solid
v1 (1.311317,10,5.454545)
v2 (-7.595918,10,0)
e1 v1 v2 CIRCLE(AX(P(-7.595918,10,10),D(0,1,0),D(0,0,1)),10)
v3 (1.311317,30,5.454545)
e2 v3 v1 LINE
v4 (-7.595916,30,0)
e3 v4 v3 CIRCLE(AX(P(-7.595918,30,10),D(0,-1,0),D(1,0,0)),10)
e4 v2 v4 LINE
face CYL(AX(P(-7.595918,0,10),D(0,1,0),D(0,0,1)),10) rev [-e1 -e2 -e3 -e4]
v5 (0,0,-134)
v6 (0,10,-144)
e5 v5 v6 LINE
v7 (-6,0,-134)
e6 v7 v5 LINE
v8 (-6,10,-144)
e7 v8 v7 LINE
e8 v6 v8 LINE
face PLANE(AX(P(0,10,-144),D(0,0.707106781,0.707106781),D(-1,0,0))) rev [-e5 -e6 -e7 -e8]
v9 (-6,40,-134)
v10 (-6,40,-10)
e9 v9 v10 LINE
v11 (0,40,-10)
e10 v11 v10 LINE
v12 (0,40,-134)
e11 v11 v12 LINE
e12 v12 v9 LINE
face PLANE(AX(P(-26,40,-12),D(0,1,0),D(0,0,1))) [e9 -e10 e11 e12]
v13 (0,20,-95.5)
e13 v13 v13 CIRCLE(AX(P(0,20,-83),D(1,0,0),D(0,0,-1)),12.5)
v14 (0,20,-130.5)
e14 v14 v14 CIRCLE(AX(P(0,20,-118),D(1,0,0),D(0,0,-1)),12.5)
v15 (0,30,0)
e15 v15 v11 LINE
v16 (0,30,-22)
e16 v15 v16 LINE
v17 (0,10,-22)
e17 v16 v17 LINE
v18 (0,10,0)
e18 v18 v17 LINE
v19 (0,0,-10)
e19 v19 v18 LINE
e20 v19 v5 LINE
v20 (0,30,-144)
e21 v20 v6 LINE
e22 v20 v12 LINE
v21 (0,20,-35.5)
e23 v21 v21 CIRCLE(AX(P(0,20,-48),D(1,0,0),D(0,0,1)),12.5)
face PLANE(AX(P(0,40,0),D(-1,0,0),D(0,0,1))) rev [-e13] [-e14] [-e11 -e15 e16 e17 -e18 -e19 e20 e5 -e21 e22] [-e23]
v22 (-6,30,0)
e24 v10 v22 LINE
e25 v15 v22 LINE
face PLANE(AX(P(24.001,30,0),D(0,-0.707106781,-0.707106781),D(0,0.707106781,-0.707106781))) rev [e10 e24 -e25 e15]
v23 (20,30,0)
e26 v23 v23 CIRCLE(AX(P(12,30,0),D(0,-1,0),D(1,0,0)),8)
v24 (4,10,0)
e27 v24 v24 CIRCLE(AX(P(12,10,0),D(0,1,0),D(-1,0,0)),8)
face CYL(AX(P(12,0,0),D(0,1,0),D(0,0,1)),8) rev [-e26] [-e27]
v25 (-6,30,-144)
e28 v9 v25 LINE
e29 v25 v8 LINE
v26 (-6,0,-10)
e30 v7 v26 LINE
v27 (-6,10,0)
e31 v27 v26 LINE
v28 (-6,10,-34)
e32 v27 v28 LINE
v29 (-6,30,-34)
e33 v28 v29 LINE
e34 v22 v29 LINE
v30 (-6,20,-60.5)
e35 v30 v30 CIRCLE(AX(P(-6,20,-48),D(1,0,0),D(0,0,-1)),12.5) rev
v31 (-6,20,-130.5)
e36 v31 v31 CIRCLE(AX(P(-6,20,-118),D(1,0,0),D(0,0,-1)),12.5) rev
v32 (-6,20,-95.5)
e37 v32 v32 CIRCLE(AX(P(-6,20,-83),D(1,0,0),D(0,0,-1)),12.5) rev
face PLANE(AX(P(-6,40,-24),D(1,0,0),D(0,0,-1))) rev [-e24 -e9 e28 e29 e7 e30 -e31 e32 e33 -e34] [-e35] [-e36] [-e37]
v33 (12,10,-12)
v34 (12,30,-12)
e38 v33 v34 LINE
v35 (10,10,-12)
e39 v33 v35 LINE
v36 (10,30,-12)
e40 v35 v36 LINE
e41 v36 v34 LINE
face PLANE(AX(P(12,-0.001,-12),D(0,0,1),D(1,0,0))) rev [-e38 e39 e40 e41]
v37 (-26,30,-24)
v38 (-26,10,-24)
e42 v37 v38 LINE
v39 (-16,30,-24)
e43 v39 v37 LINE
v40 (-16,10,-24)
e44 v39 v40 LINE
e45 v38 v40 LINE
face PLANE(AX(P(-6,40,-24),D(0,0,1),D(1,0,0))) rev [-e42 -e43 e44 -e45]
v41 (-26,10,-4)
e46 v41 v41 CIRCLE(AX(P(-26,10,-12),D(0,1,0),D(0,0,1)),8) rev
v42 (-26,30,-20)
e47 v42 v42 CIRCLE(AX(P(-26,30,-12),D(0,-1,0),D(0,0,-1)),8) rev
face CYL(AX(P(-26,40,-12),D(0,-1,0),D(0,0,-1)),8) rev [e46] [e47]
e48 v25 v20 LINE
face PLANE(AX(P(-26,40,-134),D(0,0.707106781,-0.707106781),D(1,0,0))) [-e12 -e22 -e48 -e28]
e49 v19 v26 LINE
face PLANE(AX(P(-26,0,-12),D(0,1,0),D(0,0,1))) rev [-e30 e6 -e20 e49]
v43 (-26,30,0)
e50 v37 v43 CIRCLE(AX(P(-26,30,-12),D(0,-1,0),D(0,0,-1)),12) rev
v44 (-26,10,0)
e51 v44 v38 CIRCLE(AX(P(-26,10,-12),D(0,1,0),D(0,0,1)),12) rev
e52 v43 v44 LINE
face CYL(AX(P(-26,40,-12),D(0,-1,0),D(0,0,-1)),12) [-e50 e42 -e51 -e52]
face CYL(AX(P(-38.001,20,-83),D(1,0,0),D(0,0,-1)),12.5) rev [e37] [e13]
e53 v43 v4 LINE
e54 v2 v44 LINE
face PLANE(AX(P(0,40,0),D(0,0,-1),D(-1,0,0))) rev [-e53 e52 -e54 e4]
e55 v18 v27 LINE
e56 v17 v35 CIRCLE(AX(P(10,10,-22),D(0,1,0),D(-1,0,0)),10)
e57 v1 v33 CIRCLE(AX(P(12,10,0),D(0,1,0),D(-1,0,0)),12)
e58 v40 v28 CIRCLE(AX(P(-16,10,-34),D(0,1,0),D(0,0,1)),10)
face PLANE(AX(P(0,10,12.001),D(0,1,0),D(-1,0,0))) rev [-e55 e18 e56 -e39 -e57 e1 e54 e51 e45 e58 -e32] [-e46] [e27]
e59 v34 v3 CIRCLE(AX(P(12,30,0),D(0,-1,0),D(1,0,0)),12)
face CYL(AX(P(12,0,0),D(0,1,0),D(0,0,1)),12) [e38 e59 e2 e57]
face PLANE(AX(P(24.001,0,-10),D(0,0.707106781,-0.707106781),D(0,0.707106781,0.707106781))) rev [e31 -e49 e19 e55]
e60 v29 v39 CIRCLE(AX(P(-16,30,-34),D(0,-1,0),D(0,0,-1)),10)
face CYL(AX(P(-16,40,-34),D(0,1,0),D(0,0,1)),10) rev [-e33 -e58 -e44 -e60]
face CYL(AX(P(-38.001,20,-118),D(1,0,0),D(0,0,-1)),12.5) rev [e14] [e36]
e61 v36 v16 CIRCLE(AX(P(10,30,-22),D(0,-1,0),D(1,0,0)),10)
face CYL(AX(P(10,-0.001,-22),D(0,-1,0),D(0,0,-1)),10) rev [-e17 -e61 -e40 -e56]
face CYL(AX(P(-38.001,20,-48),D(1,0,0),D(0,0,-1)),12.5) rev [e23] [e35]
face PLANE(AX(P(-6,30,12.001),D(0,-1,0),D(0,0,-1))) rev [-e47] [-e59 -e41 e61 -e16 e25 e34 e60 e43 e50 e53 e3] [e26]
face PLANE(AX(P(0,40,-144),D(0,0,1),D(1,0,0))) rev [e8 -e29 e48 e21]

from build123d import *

# Parameters (mm, degrees)
SKETCH1_R           = 8
BOSS_EXTRUDE1_DEPTH = 40
CHAMFER1_SIZE       = 10
SKETCH2_R           = 8
BOSS_EXTRUDE2_DEPTH = 40
CUT_EXTRUDE2_REACH  = 134.076
SKETCH4_W           = 40
SKETCH4_H           = 10
FILLET4_R           = 10
CUT_EXTRUDE9_REACH  = 154.84
CUT_EXTRUDE10_REACH = 153.921
FILLET5_R           = 10
CUT_EXTRUDE11_REACH = 156.208
SKETCH15_R          = 12.5


with BuildPart() as part:
    # Sketch1 → Boss-Extrude1 (new body)
    with BuildSketch(Plane(origin=(0, 0, 0), x_dir=(1, 0, 0), z_dir=(0, 1, 0))):
        with BuildLine():
            Line((0, 0), (0, 144))
            Line((0, 144), (-6, 144))
            Line((-6, 144), (-6, 24))
            Line((-6, 24), (-26, 24))
            ThreePointArc((-26, 24), (-38, 12), (-26, 0))
            Line((-26, 0), (0, 0))
        make_face()
        with Locations(Location((-26, 12, 0), (0, 0, 270))):
            Circle(SKETCH1_R, mode=Mode.SUBTRACT)
    extrude(amount=BOSS_EXTRUDE1_DEPTH)

    # Chamfer1
    chamfer1_edges = [part.edges().sort_by_distance(p)[0] for p in [
        (-3, 40, -144),
        (-3, 0, -144),
    ]]
    chamfer(chamfer1_edges, length=CHAMFER1_SIZE)

    # Sketch2 → Boss-Extrude2 (add, through all)
    with BuildSketch(Plane(origin=(0, 40, 0), x_dir=(1, 0, 0), z_dir=(0, 1, 0))):
        with BuildLine():
            ThreePointArc((0, 0), (12, -12), (24, 0))
            Line((24, 0), (24, 24))
            Line((24, 24), (0, 24))
            Line((0, 24), (0, 0))
        make_face()
        with Locations(Location((12, 0, 0), (0, 0, 270))):
            Circle(SKETCH2_R, mode=Mode.SUBTRACT)
    extrude(amount=-BOSS_EXTRUDE2_DEPTH)

    # Sketch4 → Cut-Extrude2 (cut, up to next)
    with BuildSketch(Plane(origin=(0, 0, -24), x_dir=(-1, 0, 0), z_dir=(0, 0, -1)), mode=Mode.PRIVATE) as cut_extrude2_sk1:
        with Locations((26, 35)):
            Rectangle(SKETCH4_W, SKETCH4_H)
    cut_extrude2_tool1 = extrude(cut_extrude2_sk1.sketch, amount=-CUT_EXTRUDE2_REACH, mode=Mode.PRIVATE) & part.part
    # Sketch4 → Cut-Extrude2 (cut, up to next)
    with BuildSketch(Plane(origin=(0, 0, -24), x_dir=(-1, 0, 0), z_dir=(0, 0, -1)), mode=Mode.PRIVATE) as cut_extrude2_sk2:
        with Locations((26, 5)):
            Rectangle(SKETCH4_W, SKETCH4_H)
    cut_extrude2_tool2 = extrude(cut_extrude2_sk2.sketch, amount=-CUT_EXTRUDE2_REACH, mode=Mode.PRIVATE) & part.part
    # Sketch4 → Cut-Extrude2 (cut, up to next)
    with BuildSketch(Plane(origin=(0, 0, -24), x_dir=(-1, 0, 0), z_dir=(0, 0, -1)), mode=Mode.PRIVATE) as cut_extrude2_sk3:
        with Locations((-20, 5)):
            Rectangle(SKETCH4_W, SKETCH4_H)
    cut_extrude2_tool3 = extrude(cut_extrude2_sk3.sketch, amount=-CUT_EXTRUDE2_REACH, mode=Mode.PRIVATE) & part.part
    # Sketch4 → Cut-Extrude2 (cut, up to next)
    with BuildSketch(Plane(origin=(0, 0, -24), x_dir=(-1, 0, 0), z_dir=(0, 0, -1)), mode=Mode.PRIVATE) as cut_extrude2_sk4:
        with Locations((-20, 35)):
            Rectangle(SKETCH4_W, SKETCH4_H)
    cut_extrude2_tool4 = extrude(cut_extrude2_sk4.sketch, amount=-CUT_EXTRUDE2_REACH, mode=Mode.PRIVATE) & part.part
    add(cut_extrude2_tool1.solids().sort_by_distance((-26, 35, -24))[0], mode=Mode.SUBTRACT)
    add(cut_extrude2_tool2.solids().sort_by_distance((-26, 5, -24))[0], mode=Mode.SUBTRACT)
    add(cut_extrude2_tool3.solids().sort_by_distance((20, 5, -24))[0], mode=Mode.SUBTRACT)
    add(cut_extrude2_tool4.solids().sort_by_distance((20, 35, -24))[0], mode=Mode.SUBTRACT)

    # Fillet4
    fillet4_edges = [part.edges().sort_by_distance(p)[0] for p in [
        (-6, 20, -24),
    ]]
    fillet(fillet4_edges, radius=FILLET4_R)

    # Sketch13 → Cut-Extrude9 (cut, up to next)
    with BuildSketch(Plane.ZY.offset(6), mode=Mode.PRIVATE) as cut_extrude9_sk1:
        Polygon((0, 30), (-10, 40), (0, 40), align=None)
    cut_extrude9_tool1 = extrude(cut_extrude9_sk1.sketch, amount=-CUT_EXTRUDE9_REACH, mode=Mode.PRIVATE) & part.part
    # Sketch13 → Cut-Extrude9 (cut, up to next)
    with BuildSketch(Plane.ZY.offset(6), mode=Mode.PRIVATE) as cut_extrude9_sk2:
        Polygon((0, 10), (0, 0), (-10, 0), align=None)
    cut_extrude9_tool2 = extrude(cut_extrude9_sk2.sketch, amount=-CUT_EXTRUDE9_REACH, mode=Mode.PRIVATE) & part.part
    add(cut_extrude9_tool1.solids().sort_by_distance((-6, 36.666667, -3.333333))[0], mode=Mode.SUBTRACT)
    add(cut_extrude9_tool2.solids().sort_by_distance((-6, 3.333333, -3.333333))[0], mode=Mode.SUBTRACT)

    # Sketch14 → Cut-Extrude10 (cut, up to next)
    with BuildSketch(Plane(origin=(0, 30, 0), x_dir=(1, 0, 0), z_dir=(0, 1, 0)), mode=Mode.PRIVATE) as cut_extrude10_sk1:
        with BuildLine():
            Line((12, 12), (0, 12))
            Line((0, 12), (0, 24))
            Line((0, 24), (24, 24))
            Line((24, 24), (24, 0))
            ThreePointArc((24, 0), (20.485281374, 8.485281374), (12, 12))
        make_face()
    cut_extrude10_tool1 = extrude(cut_extrude10_sk1.sketch, amount=-CUT_EXTRUDE10_REACH, mode=Mode.PRIVATE) & part.part
    add(cut_extrude10_tool1.solids().sort_by_distance((12.903097, 30, -17.158841))[0], mode=Mode.SUBTRACT)

    # Fillet5
    # the kernel refuses this fillet: 10 mm, written as the material it adds along each edge
    with BuildSketch(Plane(origin=(0, 30, -12), x_dir=(0, 0, -1), z_dir=(0, -1, 0))) as fillet5_piece_1:
        with BuildLine():
            CenterArc((FILLET5_R, FILLET5_R), FILLET5_R, 180, 90)
            Line((0, FILLET5_R), (0, 0))
            Line((0, 0), (FILLET5_R, 0))
        make_face()
    extrude(amount=20)
    with BuildSketch(Plane(origin=(0, 10, 0), x_dir=(-1, 0, 0), z_dir=(0, 1, 0))) as fillet5_piece_2_section:
        with BuildLine():
            CenterArc((7.595917942, 10), FILLET5_R, 207.035691789, 62.964308211)
            ThreePointArc((-1.311317486, 5.454545455), (-0.332434055, 2.804978595), (0, 0))
            Line((0, 0), (7.595917942, 0))
        make_face()
    fillet5_piece_2 = extrude(amount=20, mode=Mode.PRIVATE)
    fillet5_piece_2 = split(fillet5_piece_2, bisect_by=Plane(origin=(-0.444204422, 11.816695322, 1.816695322), z_dir=(0, -0.7071067811865475, 0.7071067811865476)), keep=Keep.TOP, mode=Mode.PRIVATE)
    add(fillet5_piece_2)
    with BuildSketch(Plane(origin=(0, 10, 0), x_dir=(-1, 0, 0), z_dir=(0, 1, 0))) as fillet5_piece_3_section:
        with BuildLine():
            CenterArc((7.595917942, 10), FILLET5_R, 207.035691789, 62.964308211)
            ThreePointArc((-1.311317486, 5.454545455), (-0.332434055, 2.804978595), (0, 0))
            Line((0, 0), (7.595917942, 0))
        make_face()
    fillet5_piece_3 = extrude(amount=20, mode=Mode.PRIVATE)
    fillet5_piece_3 = split(fillet5_piece_3, bisect_by=Plane(origin=(-1.853866484, 24.485517863, 5.514482137), z_dir=(0, -0.7071067811865481, -0.707106781186547)), keep=Keep.TOP, mode=Mode.PRIVATE)
    fillet5_piece_3 = split(fillet5_piece_3, bisect_by=Plane(origin=(-1.853866484, 15.514482137, 5.514482137), z_dir=(0, 0.7071067811865475, -0.7071067811865476)), keep=Keep.TOP, mode=Mode.PRIVATE)
    add(fillet5_piece_3)
    with BuildSketch(Plane(origin=(0, 10, 0), x_dir=(-1, 0, 0), z_dir=(0, 1, 0))) as fillet5_piece_4_section:
        with BuildLine():
            CenterArc((7.595917942, 10), FILLET5_R, 207.035691789, 62.964308211)
            ThreePointArc((-1.311317486, 5.454545455), (-0.332434055, 2.804978595), (0, 0))
            Line((0, 0), (7.595917942, 0))
        make_face()
    fillet5_piece_4 = extrude(amount=20, mode=Mode.PRIVATE)
    fillet5_piece_4 = split(fillet5_piece_4, bisect_by=Plane(origin=(-0.444204422, 28.183304678, 1.816695322), z_dir=(0, 0.7071067811865481, 0.707106781186547)), keep=Keep.TOP, mode=Mode.PRIVATE)
    add(fillet5_piece_4)

    # Sketch15 → Cut-Extrude11 (cut, up to next)
    with BuildSketch(Plane(origin=(0, 0, 0), x_dir=(0, 0, -1), z_dir=(1, 0, 0)), mode=Mode.PRIVATE) as cut_extrude11_sk1:
        with Locations((83, 20)):
            Circle(SKETCH15_R)
    cut_extrude11_tool1 = extrude(cut_extrude11_sk1.sketch, amount=-CUT_EXTRUDE11_REACH, mode=Mode.PRIVATE) & part.part
    # Sketch15 → Cut-Extrude11 (cut, up to next)
    with BuildSketch(Plane(origin=(0, 0, 0), x_dir=(0, 0, -1), z_dir=(1, 0, 0)), mode=Mode.PRIVATE) as cut_extrude11_sk2:
        with Locations((118, 20)):
            Circle(SKETCH15_R)
    cut_extrude11_tool2 = extrude(cut_extrude11_sk2.sketch, amount=-CUT_EXTRUDE11_REACH, mode=Mode.PRIVATE) & part.part
    # Sketch15 → Cut-Extrude11 (cut, up to next)
    with BuildSketch(Plane(origin=(0, 0, 0), x_dir=(0, 0, -1), z_dir=(1, 0, 0)), mode=Mode.PRIVATE) as cut_extrude11_sk3:
        with Locations((48, 20)):
            Circle(SKETCH15_R)
    cut_extrude11_tool3 = extrude(cut_extrude11_sk3.sketch, amount=-CUT_EXTRUDE11_REACH, mode=Mode.PRIVATE) & part.part
    add(cut_extrude11_tool1.solids().sort_by_distance((0, 20, -83))[0], mode=Mode.SUBTRACT)
    add(cut_extrude11_tool2.solids().sort_by_distance((0, 20, -118))[0], mode=Mode.SUBTRACT)
    add(cut_extrude11_tool3.solids().sort_by_distance((0, 20, -48))[0], mode=Mode.SUBTRACT)


solid = part.part
